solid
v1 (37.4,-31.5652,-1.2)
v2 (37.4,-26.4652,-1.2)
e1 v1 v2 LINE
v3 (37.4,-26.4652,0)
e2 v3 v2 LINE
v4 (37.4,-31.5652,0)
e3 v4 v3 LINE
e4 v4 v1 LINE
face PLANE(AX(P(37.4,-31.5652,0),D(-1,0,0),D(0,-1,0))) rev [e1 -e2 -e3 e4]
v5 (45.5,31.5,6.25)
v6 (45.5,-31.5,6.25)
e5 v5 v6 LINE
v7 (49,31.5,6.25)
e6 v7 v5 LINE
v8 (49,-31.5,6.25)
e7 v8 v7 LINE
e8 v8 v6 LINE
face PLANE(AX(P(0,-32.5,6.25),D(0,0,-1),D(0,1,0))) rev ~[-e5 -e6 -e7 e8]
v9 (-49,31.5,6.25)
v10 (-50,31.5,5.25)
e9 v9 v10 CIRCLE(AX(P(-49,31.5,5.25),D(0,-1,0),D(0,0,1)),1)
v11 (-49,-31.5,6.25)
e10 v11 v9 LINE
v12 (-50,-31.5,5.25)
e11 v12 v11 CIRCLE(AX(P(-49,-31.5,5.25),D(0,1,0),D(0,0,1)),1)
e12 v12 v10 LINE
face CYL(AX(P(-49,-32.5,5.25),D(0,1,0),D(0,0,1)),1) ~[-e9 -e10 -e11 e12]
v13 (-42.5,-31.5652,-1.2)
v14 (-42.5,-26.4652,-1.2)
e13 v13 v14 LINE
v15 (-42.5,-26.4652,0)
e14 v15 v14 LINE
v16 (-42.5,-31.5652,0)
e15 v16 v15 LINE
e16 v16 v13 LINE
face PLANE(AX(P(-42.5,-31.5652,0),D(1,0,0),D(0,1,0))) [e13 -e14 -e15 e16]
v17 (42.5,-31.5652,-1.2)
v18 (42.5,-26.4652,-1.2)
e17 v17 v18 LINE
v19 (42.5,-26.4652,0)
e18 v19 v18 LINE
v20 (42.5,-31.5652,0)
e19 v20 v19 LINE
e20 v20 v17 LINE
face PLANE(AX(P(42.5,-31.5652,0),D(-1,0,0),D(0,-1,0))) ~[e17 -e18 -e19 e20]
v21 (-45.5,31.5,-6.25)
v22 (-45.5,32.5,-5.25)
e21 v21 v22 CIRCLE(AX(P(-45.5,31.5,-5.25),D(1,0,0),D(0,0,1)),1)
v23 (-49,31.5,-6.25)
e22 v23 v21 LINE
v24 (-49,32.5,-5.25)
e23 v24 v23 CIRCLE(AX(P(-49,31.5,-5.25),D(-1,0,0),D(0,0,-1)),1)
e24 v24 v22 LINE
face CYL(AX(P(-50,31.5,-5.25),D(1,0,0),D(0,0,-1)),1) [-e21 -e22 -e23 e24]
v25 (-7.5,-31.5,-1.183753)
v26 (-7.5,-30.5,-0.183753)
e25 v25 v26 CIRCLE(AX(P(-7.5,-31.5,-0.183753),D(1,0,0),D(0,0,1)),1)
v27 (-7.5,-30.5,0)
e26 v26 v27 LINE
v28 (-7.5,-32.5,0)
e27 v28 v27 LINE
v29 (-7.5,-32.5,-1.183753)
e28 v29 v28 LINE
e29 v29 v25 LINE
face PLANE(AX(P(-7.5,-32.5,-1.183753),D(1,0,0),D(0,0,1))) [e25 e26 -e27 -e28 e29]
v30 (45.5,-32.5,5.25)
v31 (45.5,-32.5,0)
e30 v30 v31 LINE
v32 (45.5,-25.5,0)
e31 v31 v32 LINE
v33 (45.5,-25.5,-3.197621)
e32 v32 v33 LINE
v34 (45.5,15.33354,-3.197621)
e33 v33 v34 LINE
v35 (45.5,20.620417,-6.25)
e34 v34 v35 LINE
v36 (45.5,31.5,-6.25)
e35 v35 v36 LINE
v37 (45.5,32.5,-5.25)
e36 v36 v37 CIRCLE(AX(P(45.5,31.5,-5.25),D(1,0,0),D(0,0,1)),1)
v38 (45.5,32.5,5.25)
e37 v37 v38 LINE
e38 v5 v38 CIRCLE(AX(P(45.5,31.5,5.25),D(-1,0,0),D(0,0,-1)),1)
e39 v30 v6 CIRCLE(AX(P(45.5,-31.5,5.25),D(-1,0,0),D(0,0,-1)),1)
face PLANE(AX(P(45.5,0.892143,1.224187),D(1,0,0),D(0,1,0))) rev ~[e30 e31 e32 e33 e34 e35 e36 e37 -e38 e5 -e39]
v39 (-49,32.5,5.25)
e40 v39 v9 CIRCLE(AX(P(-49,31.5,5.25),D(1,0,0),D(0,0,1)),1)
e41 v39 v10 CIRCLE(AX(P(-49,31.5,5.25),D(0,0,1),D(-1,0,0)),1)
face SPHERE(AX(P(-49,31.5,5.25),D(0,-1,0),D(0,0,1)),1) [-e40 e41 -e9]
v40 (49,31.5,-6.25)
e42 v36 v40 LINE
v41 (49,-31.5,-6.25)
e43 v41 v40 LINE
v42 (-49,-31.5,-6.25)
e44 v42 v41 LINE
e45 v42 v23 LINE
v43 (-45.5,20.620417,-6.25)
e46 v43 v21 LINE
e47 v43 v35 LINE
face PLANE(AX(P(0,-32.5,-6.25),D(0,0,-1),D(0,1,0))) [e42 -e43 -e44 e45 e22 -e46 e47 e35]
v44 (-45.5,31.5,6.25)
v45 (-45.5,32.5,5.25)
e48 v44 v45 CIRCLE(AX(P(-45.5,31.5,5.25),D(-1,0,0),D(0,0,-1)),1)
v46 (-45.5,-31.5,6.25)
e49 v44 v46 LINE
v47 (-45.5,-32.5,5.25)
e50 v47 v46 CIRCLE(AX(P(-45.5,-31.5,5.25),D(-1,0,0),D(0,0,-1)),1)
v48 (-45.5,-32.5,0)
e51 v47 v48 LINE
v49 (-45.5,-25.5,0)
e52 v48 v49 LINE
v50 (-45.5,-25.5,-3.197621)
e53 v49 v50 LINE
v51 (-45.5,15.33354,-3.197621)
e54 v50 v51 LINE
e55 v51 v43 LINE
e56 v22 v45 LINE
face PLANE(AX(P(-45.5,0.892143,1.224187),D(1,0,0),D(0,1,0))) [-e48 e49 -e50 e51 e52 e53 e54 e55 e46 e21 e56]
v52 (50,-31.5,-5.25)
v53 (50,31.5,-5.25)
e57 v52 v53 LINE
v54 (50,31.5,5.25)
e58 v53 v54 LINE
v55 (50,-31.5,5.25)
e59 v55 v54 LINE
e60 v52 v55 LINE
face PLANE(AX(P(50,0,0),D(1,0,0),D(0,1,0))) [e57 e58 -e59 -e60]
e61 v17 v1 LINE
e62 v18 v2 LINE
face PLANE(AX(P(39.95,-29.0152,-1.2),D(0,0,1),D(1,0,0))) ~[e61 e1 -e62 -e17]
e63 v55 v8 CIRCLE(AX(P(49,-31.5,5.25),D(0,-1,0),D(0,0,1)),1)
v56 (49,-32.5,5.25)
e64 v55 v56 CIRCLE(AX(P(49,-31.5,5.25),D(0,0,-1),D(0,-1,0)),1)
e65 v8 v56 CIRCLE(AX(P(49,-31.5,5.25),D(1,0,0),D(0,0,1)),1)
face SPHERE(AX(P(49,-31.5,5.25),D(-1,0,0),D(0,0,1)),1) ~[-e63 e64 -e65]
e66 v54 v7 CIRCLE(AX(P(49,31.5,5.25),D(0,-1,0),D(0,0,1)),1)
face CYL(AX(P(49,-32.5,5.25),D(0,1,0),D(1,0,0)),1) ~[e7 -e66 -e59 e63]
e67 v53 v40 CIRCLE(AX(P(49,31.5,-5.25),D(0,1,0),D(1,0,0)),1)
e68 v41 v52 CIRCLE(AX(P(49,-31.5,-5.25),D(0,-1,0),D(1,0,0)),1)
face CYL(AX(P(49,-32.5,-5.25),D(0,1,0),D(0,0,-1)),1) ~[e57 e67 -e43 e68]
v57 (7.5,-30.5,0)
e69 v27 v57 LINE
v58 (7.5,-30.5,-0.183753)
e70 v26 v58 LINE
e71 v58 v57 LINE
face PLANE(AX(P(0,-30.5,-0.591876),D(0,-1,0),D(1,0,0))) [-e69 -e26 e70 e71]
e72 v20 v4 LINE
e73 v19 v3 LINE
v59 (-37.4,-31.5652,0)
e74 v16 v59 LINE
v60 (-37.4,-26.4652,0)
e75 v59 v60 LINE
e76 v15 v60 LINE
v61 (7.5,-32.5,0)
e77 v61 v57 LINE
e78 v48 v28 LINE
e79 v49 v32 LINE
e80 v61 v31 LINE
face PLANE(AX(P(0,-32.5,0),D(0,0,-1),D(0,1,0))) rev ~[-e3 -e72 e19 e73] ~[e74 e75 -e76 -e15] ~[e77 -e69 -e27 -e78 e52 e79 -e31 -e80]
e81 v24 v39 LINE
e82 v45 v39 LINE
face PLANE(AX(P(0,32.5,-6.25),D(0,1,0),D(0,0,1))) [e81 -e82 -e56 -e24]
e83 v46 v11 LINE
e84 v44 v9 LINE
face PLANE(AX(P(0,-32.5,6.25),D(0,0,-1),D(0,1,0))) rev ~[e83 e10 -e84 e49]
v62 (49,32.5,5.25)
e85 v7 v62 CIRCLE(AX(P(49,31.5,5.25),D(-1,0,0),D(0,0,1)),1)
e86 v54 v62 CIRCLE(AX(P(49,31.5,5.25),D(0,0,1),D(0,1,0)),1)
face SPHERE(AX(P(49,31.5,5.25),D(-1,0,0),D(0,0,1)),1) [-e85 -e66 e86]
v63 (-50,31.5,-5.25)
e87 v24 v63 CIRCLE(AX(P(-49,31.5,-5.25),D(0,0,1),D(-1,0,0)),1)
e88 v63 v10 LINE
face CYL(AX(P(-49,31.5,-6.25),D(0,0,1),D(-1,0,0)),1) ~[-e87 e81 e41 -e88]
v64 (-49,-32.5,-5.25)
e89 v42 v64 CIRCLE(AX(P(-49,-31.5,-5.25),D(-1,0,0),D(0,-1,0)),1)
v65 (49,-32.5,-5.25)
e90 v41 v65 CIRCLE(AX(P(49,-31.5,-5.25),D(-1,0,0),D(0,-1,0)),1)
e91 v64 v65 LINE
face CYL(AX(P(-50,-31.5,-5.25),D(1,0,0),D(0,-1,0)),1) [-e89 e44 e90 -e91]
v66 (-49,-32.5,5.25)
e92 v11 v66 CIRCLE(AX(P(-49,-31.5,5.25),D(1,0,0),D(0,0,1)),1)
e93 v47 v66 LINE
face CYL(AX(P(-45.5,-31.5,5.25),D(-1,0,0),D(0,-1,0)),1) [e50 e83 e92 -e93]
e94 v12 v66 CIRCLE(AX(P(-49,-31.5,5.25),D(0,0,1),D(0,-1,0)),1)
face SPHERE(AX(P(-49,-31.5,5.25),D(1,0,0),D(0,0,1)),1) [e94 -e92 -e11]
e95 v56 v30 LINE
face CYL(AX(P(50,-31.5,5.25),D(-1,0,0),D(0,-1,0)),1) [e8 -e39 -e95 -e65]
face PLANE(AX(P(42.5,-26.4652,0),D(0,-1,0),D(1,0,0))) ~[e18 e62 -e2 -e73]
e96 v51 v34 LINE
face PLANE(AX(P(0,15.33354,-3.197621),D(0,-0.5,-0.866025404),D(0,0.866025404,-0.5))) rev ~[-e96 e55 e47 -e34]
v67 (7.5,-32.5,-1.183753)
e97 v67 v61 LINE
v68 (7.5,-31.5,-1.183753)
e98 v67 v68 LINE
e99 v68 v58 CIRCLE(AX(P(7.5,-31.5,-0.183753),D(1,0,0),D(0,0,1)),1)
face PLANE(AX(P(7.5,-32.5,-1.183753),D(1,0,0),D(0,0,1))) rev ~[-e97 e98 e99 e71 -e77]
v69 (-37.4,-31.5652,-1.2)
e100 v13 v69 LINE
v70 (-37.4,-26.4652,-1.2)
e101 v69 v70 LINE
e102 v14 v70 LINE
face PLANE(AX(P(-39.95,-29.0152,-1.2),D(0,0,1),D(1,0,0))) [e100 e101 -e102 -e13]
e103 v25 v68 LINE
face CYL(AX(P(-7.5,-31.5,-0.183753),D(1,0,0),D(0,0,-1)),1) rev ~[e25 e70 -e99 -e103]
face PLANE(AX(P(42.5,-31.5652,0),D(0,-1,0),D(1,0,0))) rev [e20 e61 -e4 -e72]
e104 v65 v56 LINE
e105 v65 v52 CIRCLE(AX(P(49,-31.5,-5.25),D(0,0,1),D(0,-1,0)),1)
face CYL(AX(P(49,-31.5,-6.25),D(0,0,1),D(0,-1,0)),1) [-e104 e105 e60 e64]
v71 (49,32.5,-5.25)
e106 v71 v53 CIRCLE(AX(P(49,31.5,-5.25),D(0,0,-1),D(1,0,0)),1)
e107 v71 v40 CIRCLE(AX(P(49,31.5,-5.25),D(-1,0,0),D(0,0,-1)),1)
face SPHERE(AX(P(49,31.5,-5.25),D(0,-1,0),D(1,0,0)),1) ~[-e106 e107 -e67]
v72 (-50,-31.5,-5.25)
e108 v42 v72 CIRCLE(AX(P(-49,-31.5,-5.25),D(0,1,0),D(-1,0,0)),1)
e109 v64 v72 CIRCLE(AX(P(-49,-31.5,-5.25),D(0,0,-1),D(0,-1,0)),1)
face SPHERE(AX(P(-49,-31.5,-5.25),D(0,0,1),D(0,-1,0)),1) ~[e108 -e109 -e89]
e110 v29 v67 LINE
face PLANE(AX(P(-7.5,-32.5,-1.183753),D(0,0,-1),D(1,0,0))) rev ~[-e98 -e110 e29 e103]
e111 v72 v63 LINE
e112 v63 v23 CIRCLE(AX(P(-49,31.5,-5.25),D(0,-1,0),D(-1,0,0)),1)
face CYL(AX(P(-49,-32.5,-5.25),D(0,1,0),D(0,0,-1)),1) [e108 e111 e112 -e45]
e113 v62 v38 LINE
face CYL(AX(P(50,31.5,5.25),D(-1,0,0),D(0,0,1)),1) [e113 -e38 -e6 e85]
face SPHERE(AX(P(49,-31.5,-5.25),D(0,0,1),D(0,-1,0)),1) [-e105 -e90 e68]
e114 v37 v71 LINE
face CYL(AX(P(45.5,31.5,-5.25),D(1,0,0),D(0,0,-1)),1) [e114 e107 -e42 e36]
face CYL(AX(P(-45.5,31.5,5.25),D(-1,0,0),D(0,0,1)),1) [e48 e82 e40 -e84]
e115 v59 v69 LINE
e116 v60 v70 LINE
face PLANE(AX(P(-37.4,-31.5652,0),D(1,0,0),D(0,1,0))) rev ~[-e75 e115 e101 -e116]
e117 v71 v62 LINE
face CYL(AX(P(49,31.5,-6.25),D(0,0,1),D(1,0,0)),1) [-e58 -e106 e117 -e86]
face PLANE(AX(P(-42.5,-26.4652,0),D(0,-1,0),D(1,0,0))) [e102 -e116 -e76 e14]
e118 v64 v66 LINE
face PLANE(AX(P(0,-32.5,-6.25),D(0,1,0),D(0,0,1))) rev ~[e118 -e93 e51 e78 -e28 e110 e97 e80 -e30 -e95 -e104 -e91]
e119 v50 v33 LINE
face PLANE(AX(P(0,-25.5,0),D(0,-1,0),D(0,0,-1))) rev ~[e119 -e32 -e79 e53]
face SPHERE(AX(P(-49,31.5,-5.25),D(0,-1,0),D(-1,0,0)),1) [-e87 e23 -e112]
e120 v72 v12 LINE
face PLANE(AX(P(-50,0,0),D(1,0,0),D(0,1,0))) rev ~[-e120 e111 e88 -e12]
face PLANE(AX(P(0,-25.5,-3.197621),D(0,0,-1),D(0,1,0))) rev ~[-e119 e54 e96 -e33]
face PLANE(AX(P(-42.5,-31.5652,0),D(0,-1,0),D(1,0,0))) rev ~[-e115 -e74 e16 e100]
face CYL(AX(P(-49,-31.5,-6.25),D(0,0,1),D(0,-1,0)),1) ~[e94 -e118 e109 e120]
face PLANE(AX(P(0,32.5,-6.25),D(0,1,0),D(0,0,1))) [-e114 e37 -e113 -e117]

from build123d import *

# Parameters (mm, degrees)
F0_W     = 65
F0_H     = 12.5
F1_DEPTH = 50
F3_DEPTH = 45.5
F4_W     = 5.1
F4_H     = 5.1
F5_DEPTH = 1.2
F6_R     = 1
F7_W     = 15
F7_H     = 1.1837528777
F8_DEPTH = 2
F9_R     = 1


# Not quite as in the source:
# - a pattern or mirror of a feature is missing from the dataset's text; its kind, count and spacing are read off the source's solid


with BuildPart() as f1:
    # F0 (on Right) → F1 (new body, symmetric)
    with BuildSketch(Plane.YZ):
        Rectangle(F0_W, F0_H)
    extrude(amount=F1_DEPTH, both=True)

    # F2 (on Right) → F3 (cut, symmetric)
    with BuildSketch(Plane.YZ):
        Polygon((-32.5, 6.25), (-32.5, 0), (-25.5, 0), (-25.5, -3.1976206858), (15.3335404618, -3.1976206858), (20.620416518, -6.25), (32.5, -6.25), (32.5, 6.25), align=None)
    extrude(amount=F3_DEPTH, both=True, mode=Mode.SUBTRACT)

    # F4 (on face) → F5 (cut)
    with BuildSketch(Plane.XY):
        with Locations((-39.95, -29.0152)):
            Rectangle(F4_W, F4_H)
    f5 = extrude(amount=-F5_DEPTH, mode=Mode.SUBTRACT)

    # F5_copies: F5 across plane
    add(f5.mirror(Plane(origin=(0, 0, 0), x_dir=(0, 0, 1), z_dir=(1, 0, 0))), mode=Mode.SUBTRACT)

    # F6
    f6_edges = [f1.edges().sort_by_distance(p)[0] for p in [
        (-47.75, -32.5, 6.25),
        (47.75, -32.5, 6.25),
        (-50, 0, 6.25),
        (-47.75, 32.5, 6.25),
        (47.75, 32.5, 6.25),
        (50, 0, 6.25),
        (-50, -32.5, 0),
        (50, -32.5, 0),
        (0, -32.5, -6.25),
        (50, 0, -6.25),
        (50, 32.5, 0),
        (-50, 0, -6.25),
        (-50, 32.5, 0),
        (-47.75, 32.5, -6.25),
        (47.75, 32.5, -6.25),
    ]]
    fillet(f6_edges, radius=F6_R)

    # F7 (on face) → F8 (cut)
    with BuildSketch(Plane.XZ.offset(32.5)):
        with Locations((0, -0.5918764388)):
            Rectangle(F7_W, F7_H)
    extrude(amount=-F8_DEPTH, mode=Mode.SUBTRACT)

    # F9
    f9_edges = [f1.edges().sort_by_distance(p)[0] for p in [
        (0, -30.5, -1.183753),
    ]]
    fillet(f9_edges, radius=F9_R)


solid = f1.part
